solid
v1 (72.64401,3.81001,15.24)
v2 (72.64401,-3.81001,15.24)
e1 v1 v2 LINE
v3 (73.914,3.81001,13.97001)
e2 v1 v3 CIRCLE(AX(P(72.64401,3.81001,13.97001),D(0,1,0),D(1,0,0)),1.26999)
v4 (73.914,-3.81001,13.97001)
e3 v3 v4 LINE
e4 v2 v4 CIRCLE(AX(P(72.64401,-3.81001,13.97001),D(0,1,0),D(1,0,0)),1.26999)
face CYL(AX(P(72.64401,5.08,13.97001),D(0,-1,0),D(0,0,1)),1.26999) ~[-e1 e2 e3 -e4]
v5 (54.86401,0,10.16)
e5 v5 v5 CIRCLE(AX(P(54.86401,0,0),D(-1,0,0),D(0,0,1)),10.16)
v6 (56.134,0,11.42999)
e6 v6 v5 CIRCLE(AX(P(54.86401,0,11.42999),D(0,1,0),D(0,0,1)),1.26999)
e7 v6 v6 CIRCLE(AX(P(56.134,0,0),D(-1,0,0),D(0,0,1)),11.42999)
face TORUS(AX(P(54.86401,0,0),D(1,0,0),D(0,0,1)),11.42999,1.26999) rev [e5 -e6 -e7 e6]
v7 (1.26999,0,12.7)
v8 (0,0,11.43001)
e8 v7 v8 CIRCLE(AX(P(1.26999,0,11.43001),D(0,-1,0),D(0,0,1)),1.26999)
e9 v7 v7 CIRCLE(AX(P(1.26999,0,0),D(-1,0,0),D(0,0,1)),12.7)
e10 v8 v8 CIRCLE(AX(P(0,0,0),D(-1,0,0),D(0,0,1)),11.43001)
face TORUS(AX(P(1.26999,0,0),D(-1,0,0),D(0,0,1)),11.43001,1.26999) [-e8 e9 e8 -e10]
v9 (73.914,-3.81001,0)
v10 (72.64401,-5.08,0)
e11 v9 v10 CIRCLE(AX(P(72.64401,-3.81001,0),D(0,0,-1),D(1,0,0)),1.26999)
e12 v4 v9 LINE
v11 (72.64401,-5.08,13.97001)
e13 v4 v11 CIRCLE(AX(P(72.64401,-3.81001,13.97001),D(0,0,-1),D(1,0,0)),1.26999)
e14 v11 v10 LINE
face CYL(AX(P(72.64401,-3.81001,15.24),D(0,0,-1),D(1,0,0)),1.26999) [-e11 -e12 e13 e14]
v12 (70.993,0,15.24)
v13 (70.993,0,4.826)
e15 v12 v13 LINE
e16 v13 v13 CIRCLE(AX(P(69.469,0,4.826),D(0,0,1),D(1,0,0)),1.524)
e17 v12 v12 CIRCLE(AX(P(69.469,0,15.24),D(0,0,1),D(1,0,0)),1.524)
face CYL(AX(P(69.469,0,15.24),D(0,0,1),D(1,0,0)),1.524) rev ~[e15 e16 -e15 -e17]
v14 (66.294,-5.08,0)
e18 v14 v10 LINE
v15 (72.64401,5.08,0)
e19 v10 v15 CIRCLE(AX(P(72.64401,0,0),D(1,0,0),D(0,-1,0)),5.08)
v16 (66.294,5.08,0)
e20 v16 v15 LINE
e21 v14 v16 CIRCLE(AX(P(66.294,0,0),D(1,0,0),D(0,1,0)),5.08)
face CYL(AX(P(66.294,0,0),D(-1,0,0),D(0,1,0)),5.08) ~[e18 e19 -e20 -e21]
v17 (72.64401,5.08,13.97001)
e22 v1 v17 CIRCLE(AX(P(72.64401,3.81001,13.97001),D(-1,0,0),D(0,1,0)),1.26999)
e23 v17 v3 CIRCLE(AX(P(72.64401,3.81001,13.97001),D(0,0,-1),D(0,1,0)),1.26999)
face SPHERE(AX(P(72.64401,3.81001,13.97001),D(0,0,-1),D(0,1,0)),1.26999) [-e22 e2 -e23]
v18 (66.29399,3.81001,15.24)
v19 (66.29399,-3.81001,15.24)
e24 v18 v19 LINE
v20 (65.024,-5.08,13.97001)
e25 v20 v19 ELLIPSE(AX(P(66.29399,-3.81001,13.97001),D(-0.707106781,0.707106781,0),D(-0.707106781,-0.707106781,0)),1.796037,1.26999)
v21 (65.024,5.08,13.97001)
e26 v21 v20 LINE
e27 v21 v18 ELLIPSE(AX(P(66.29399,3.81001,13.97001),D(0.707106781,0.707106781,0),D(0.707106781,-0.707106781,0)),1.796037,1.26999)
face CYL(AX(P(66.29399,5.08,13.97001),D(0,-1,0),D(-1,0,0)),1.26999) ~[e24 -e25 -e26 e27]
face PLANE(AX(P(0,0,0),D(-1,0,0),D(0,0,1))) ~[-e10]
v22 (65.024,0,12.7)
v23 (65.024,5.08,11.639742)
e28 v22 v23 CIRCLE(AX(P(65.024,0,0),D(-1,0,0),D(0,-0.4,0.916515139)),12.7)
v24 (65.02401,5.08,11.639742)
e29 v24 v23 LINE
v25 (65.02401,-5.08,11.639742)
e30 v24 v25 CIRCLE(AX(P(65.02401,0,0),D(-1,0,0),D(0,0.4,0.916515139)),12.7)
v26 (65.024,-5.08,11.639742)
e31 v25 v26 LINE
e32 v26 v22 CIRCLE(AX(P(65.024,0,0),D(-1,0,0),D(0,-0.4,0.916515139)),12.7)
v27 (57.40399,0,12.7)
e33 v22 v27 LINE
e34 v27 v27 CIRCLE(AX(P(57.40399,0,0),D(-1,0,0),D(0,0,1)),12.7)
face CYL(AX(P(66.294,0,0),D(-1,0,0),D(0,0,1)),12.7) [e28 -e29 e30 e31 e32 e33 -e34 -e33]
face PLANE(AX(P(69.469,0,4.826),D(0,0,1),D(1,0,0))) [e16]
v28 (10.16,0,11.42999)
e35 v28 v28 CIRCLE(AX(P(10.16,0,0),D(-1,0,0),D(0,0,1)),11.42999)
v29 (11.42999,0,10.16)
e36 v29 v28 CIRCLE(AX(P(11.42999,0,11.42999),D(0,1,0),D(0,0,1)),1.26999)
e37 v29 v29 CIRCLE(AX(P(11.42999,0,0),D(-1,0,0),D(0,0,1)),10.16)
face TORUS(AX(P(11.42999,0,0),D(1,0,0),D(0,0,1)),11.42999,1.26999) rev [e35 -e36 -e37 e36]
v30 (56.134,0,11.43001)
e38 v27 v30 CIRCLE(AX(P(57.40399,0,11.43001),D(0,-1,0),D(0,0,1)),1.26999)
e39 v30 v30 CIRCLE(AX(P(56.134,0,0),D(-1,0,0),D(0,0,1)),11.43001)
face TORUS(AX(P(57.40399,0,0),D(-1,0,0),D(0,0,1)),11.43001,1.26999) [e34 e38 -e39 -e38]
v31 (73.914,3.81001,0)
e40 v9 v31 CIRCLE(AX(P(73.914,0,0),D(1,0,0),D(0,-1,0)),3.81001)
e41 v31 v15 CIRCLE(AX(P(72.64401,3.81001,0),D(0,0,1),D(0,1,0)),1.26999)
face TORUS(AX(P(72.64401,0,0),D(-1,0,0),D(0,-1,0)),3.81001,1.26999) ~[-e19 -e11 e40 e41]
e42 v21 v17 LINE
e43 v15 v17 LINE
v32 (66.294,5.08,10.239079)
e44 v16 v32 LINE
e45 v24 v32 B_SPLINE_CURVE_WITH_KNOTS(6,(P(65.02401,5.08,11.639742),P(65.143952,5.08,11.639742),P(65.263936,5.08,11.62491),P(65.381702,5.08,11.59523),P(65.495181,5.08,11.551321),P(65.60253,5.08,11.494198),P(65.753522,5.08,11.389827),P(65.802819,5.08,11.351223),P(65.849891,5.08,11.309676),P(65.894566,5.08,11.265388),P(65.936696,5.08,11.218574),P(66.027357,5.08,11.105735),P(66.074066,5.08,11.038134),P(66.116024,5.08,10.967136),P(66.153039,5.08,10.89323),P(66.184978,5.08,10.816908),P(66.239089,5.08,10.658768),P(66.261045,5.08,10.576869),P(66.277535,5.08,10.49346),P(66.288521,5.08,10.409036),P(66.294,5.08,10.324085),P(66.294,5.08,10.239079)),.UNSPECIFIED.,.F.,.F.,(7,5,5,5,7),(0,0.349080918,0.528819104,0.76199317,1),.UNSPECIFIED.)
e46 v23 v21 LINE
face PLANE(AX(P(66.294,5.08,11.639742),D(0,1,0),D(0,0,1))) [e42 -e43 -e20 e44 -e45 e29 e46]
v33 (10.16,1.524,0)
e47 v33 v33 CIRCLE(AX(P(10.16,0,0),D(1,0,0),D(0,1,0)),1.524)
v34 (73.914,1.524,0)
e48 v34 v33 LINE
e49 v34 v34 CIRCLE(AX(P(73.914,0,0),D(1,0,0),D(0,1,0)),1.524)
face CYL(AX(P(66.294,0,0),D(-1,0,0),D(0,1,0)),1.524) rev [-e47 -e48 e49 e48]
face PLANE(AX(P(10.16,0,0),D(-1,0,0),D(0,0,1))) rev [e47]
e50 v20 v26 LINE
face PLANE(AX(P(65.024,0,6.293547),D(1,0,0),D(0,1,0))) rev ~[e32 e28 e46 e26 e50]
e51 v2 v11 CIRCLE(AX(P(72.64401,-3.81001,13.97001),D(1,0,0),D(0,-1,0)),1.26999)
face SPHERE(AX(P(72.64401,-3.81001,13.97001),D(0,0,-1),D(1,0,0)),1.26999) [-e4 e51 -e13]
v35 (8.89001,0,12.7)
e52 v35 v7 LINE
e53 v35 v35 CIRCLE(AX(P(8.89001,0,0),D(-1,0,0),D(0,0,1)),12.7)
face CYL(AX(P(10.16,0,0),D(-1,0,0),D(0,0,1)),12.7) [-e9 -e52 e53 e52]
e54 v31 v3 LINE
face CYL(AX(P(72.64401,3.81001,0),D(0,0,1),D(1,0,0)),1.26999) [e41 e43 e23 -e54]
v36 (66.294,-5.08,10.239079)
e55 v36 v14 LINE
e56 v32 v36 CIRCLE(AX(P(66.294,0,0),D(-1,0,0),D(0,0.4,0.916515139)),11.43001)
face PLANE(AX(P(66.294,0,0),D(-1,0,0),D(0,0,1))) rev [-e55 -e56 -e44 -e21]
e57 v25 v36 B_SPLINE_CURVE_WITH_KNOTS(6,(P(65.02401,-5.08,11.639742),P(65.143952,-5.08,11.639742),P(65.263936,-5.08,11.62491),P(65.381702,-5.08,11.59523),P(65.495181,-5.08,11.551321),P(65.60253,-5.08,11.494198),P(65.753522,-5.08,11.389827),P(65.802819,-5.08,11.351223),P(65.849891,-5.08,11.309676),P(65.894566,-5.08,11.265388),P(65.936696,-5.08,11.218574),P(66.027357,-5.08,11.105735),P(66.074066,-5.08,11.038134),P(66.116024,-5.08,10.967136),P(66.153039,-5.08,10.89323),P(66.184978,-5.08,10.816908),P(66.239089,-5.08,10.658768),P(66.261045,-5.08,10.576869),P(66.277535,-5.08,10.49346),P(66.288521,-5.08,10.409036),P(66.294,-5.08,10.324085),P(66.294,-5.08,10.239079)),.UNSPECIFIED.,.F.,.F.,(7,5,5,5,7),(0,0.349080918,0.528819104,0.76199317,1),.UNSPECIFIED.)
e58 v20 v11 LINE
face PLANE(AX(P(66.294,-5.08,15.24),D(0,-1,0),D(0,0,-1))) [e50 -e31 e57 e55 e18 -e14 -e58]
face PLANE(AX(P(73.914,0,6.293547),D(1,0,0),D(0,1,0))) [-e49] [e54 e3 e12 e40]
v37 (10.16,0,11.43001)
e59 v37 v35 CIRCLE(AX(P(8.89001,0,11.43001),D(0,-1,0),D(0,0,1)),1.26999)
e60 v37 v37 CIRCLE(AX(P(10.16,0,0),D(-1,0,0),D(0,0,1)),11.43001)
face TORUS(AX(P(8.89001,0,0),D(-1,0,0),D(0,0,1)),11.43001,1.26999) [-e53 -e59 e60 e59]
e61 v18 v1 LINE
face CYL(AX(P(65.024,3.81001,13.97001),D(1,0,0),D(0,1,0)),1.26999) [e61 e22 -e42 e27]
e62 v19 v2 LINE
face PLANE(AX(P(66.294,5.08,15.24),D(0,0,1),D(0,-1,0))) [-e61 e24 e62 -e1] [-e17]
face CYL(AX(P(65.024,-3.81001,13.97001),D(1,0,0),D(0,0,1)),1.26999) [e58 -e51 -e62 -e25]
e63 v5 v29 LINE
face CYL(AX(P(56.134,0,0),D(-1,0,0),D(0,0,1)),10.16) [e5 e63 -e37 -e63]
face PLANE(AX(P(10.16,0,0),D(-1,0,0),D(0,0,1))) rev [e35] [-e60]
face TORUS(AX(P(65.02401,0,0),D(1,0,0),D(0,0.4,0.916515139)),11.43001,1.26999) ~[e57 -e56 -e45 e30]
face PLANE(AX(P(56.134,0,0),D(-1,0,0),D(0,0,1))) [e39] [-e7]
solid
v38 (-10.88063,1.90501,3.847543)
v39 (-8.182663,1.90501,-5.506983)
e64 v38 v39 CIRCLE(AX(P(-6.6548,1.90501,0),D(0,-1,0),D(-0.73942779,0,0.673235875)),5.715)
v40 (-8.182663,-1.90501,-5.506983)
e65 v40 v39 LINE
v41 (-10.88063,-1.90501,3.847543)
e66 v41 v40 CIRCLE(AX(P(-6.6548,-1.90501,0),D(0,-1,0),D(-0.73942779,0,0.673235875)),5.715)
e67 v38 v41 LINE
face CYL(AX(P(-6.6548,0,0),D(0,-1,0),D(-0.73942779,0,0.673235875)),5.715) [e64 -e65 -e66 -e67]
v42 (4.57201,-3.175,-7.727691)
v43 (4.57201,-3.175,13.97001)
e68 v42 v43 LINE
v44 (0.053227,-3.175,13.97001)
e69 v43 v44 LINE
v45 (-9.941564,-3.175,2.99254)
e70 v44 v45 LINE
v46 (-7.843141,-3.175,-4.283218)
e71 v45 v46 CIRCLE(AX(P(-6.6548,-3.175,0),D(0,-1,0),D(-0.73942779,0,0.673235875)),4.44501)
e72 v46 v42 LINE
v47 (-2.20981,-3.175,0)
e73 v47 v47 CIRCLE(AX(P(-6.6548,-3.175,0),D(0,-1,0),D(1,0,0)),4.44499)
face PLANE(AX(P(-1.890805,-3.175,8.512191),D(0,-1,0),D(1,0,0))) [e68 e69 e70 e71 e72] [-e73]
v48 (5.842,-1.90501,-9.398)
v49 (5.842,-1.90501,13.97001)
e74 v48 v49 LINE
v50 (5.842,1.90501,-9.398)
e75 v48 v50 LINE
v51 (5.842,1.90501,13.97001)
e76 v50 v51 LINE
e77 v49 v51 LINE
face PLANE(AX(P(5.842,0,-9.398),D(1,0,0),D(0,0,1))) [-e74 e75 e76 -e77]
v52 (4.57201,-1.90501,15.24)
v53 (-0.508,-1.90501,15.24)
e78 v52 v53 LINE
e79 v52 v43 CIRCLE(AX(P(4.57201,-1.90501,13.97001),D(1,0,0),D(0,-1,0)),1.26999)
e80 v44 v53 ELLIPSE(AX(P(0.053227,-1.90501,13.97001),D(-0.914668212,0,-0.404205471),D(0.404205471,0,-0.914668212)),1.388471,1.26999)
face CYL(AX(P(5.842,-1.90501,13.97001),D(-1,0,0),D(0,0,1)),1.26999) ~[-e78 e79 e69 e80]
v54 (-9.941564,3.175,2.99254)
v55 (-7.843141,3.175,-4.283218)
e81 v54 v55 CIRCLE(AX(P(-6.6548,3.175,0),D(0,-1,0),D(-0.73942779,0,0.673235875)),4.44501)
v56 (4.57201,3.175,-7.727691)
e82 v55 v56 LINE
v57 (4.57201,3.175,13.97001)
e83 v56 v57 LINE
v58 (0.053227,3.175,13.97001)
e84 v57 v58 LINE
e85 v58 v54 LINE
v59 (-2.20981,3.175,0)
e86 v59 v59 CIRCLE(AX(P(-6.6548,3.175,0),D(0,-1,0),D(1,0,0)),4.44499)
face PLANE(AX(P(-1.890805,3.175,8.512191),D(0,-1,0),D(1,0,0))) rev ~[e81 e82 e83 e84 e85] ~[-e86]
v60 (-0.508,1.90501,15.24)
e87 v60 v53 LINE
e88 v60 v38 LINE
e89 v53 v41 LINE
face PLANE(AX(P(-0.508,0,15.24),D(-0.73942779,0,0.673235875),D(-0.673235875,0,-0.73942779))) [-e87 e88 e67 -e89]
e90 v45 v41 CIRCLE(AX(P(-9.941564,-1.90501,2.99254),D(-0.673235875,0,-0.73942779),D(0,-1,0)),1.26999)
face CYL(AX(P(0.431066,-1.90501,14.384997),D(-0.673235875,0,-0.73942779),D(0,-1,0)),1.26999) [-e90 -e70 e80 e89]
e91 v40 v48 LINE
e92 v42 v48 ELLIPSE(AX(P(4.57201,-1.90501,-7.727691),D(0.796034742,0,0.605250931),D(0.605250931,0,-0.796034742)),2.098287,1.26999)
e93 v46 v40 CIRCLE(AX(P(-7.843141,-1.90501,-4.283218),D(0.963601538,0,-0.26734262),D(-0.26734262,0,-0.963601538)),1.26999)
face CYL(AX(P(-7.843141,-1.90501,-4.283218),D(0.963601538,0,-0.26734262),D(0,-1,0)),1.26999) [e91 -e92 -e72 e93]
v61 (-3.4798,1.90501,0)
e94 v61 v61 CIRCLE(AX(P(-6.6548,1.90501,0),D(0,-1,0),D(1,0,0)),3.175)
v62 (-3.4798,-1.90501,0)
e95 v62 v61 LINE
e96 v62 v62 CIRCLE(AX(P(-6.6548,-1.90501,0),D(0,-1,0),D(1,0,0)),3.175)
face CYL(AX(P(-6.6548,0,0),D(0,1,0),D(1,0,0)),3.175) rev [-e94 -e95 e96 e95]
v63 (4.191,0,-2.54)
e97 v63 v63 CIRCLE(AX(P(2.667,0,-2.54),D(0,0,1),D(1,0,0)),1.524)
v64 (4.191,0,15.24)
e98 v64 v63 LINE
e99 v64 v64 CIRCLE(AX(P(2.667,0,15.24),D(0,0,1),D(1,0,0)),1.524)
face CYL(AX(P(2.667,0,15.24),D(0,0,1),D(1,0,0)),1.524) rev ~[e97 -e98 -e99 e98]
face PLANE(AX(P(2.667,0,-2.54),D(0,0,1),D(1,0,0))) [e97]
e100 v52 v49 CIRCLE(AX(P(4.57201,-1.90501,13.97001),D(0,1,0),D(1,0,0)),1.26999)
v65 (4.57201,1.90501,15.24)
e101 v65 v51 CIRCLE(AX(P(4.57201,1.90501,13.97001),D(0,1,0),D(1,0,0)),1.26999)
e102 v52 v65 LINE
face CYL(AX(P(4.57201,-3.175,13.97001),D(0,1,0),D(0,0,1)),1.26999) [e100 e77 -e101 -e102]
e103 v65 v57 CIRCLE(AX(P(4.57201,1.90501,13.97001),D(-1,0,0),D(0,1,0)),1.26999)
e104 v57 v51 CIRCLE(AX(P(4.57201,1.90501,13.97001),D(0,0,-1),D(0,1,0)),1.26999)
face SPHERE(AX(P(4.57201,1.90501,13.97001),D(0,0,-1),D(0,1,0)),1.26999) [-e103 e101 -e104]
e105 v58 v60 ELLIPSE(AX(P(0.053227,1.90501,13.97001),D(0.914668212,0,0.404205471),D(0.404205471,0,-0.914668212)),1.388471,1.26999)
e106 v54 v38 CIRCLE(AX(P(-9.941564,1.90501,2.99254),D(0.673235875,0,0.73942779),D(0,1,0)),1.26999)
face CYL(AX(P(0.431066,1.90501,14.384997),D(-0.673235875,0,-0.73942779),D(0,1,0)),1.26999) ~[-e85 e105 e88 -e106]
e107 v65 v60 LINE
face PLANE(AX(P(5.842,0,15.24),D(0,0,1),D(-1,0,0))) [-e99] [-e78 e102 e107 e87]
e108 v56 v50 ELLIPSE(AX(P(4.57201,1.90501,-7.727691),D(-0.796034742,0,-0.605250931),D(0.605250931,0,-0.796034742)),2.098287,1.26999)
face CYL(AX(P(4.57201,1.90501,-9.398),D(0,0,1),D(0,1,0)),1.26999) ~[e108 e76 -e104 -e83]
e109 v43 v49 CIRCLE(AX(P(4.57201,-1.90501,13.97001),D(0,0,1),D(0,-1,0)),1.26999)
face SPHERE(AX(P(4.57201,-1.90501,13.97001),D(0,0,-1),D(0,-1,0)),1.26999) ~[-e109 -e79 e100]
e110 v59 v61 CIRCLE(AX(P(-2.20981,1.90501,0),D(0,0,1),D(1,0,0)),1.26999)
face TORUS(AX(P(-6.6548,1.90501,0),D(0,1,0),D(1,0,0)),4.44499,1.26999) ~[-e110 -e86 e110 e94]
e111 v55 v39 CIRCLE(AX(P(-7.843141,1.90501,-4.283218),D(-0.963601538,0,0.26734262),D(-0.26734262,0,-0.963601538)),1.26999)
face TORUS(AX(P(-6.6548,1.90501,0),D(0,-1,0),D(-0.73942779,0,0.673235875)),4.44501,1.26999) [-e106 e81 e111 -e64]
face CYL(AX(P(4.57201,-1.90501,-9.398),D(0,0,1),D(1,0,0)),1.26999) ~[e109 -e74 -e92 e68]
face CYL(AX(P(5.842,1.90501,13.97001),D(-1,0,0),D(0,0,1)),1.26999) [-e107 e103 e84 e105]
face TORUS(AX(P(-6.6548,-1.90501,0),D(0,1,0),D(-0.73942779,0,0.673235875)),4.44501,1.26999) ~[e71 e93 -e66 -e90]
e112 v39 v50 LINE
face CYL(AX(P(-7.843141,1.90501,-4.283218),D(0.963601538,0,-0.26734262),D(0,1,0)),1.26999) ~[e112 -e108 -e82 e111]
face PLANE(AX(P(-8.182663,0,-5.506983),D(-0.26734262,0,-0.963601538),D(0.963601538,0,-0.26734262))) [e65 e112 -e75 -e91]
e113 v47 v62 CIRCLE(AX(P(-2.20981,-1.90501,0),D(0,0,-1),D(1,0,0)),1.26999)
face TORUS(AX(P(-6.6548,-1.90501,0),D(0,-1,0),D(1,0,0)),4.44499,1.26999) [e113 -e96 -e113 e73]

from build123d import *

# Parameters (mm, degrees)
F0_W      = 5.842
F0_H      = 12.7
F0_R      = 3.175
F1_DEPTH  = 3.175
F3_R      = 1.524
F4_DEPTH  = 7.62
F5_DEPTH  = 1.27
F6_DEPTH  = 56.134
F7_R      = 1.524
F8_DEPTH  = 17.78
F9_R      = 1.524
F10_DEPTH = 10.414
F11_R     = 1.26999
F11_2_R   = 1.26999


# Not quite as in the source:
# - a fillet or chamfer is up to 0.001 mm smaller than in the source, because OpenCascade refuses the exact size


with BuildPart() as f1:
    # F0 (on Front) → F1 (new body, symmetric)
    with BuildSketch(Plane.XZ):
        with BuildLine():
            Line((-0.9398, 0), (0, 0))
            Line((0, 0), (0, 12.7))
            Line((0, 12.7), (5.842, 12.7))
            Line((5.842, 12.7), (5.842, 15.24))
            Line((5.842, 15.24), (-0.508, 15.24))
            Line((-0.508, 15.24), (-10.8806298187, 3.8475430269))
            ThreePointArc((-10.8806298187, 3.8475430269), (-4.5919612295, 5.3297205562), (-0.9398, 0))
        make_face()
        with Locations((2.921, 6.35)):
            Rectangle(F0_W, F0_H)
        with BuildLine():
            Line((5.842, 0), (0, 0))
            Line((0, 0), (-0.9398, 0))
            ThreePointArc((-0.9398, 0), (-3.1957909266, -4.5493385486), (-8.1826630726, -5.5069827884))
            Line((-8.1826630726, -5.5069827884), (5.842, -9.398))
            Line((5.842, -9.398), (5.842, 0))
        make_face()
        with BuildLine():
            ThreePointArc((-8.1826630726, -5.5069827884), (-3.1957909266, -4.5493385486), (-0.9398, 0))
            ThreePointArc((-0.9398, 0), (-4.5919612295, 5.3297205562), (-10.8806298187, 3.8475430269))
            ThreePointArc((-10.8806298187, 3.8475430269), (-12.1459778134, -1.5837270034), (-8.1826630726, -5.5069827884))
        make_face()
        with Locations((-6.6548, 0)):
            Circle(F0_R, mode=Mode.SUBTRACT)
    extrude(amount=F1_DEPTH, both=True)

    # F7 (on face) → F8 (cut)
    with BuildSketch(Plane.XY.offset(15.24)):
        with Locations((2.667, 0)):
            Circle(F7_R)
    extrude(amount=-F8_DEPTH, mode=Mode.SUBTRACT)

    # F11 (radius 1.27 in the source; OpenCascade refuses exactly that, so slightly less here)
    f11_edges = [f1.edges().sort_by_distance(p)[0] for p in [
        (-1.170332, -3.175, -7.452491),
        (5.842, -3.175, 2.921),
        (2.667, -3.175, 15.24),
        (-5.694315, -3.175, 9.543772),
        (-12.145978, -3.175, -1.583727),
        (-9.8298, -3.175, 0),
        (-1.170332, 3.175, -7.452491),
        (5.842, 3.175, 2.921),
        (2.667, 3.175, 15.24),
        (-5.694315, 3.175, 9.543772),
        (-12.145978, 3.175, -1.583727),
        (-9.8298, 3.175, 0),
        (5.842, 0, 15.24),
    ]]
    fillet(f11_edges, radius=F11_R)


with BuildPart() as f2:
    # F0 (on Front) → F2 (revolve)
    with BuildSketch(Plane.XZ):
        Polygon((5.842, 12.7), (5.842, 0), (66.294, 0), (66.294, 12.7), (56.134, 12.7), (56.134, 10.16), (10.16, 10.16), (10.16, 12.7), align=None)
        with Locations((2.921, 6.35)):
            Rectangle(F0_W, F0_H)
    revolve(axis=Axis((33.147, 0, 0), (-1, 0, 0)))

    # F3 (on face) → F4 (join)
    with BuildSketch(Plane.YZ.offset(66.294)):
        with BuildLine():
            ThreePointArc((-5.08, 0), (0, 5.08), (5.08, 0))
            Line((5.08, 0), (5.08, 11.6397422652))
            ThreePointArc((5.08, 11.6397422652), (0, 12.7), (-5.08, 11.6397422652))
            Line((-5.08, 11.6397422652), (-5.08, 0))
        make_face()
        with BuildLine():
            ThreePointArc((-5.08, 0), (0, -5.08), (5.08, 0))
            ThreePointArc((5.08, 0), (0, 5.08), (-5.08, 0))
        make_face()
        Circle(F3_R, mode=Mode.SUBTRACT)
        with BuildLine():
            ThreePointArc((-5.08, 11.6397422652), (0, 12.7), (5.08, 11.6397422652))
            Line((5.08, 11.6397422652), (5.08, 15.24))
            Line((5.08, 15.24), (-5.08, 15.24))
            Line((-5.08, 15.24), (-5.08, 11.6397422652))
        make_face()
    extrude(amount=F4_DEPTH)

    # F5 (add): a face of the model
    f5_faces = [f2.faces().sort_by_distance(p)[0] for p in [
        (66.294, 0, 13.7792682875),
    ]]
    extrude(f5_faces, amount=F5_DEPTH)

    # F6 (cut, through all): a face of the model
    f6_faces = [f2.faces().sort_by_distance(p)[0] for p in [
        (66.294, 0, 0),
    ]]
    extrude(f6_faces, amount=-F6_DEPTH, mode=Mode.SUBTRACT)

    # F9 (on face) → F10 (cut)
    with BuildSketch(Plane.XY.offset(15.24)):
        with Locations((69.469, 0)):
            Circle(F9_R)
    extrude(amount=-F10_DEPTH, mode=Mode.SUBTRACT)

    # F11#2 (radius 1.27 in the source; OpenCascade refuses exactly that, so slightly less here)
    f11_2_edges = [f2.edges().sort_by_distance(p)[0] for p in [
        (56.134, 0, -10.16),
        (10.16, 0, -10.16),
        (33.147, 0, 10.16),
        (10.16, 0, -12.7),
        (0, 0, -12.7),
        (5.08, 0, 12.7),
        (66.294, 0, -12.7),
        (56.134, 0, -12.7),
        (73.914, 0, -5.08),
        (73.914, 5.08, 7.62),
        (73.914, -5.08, 7.62),
        (69.469, 5.08, 15.24),
        (73.914, 0, 15.24),
        (65.024, 0, 15.24),
        (69.469, -5.08, 15.24),
    ]]
    fillet(f11_2_edges, radius=F11_2_R)


solid = Compound([f1.part, f2.part])
